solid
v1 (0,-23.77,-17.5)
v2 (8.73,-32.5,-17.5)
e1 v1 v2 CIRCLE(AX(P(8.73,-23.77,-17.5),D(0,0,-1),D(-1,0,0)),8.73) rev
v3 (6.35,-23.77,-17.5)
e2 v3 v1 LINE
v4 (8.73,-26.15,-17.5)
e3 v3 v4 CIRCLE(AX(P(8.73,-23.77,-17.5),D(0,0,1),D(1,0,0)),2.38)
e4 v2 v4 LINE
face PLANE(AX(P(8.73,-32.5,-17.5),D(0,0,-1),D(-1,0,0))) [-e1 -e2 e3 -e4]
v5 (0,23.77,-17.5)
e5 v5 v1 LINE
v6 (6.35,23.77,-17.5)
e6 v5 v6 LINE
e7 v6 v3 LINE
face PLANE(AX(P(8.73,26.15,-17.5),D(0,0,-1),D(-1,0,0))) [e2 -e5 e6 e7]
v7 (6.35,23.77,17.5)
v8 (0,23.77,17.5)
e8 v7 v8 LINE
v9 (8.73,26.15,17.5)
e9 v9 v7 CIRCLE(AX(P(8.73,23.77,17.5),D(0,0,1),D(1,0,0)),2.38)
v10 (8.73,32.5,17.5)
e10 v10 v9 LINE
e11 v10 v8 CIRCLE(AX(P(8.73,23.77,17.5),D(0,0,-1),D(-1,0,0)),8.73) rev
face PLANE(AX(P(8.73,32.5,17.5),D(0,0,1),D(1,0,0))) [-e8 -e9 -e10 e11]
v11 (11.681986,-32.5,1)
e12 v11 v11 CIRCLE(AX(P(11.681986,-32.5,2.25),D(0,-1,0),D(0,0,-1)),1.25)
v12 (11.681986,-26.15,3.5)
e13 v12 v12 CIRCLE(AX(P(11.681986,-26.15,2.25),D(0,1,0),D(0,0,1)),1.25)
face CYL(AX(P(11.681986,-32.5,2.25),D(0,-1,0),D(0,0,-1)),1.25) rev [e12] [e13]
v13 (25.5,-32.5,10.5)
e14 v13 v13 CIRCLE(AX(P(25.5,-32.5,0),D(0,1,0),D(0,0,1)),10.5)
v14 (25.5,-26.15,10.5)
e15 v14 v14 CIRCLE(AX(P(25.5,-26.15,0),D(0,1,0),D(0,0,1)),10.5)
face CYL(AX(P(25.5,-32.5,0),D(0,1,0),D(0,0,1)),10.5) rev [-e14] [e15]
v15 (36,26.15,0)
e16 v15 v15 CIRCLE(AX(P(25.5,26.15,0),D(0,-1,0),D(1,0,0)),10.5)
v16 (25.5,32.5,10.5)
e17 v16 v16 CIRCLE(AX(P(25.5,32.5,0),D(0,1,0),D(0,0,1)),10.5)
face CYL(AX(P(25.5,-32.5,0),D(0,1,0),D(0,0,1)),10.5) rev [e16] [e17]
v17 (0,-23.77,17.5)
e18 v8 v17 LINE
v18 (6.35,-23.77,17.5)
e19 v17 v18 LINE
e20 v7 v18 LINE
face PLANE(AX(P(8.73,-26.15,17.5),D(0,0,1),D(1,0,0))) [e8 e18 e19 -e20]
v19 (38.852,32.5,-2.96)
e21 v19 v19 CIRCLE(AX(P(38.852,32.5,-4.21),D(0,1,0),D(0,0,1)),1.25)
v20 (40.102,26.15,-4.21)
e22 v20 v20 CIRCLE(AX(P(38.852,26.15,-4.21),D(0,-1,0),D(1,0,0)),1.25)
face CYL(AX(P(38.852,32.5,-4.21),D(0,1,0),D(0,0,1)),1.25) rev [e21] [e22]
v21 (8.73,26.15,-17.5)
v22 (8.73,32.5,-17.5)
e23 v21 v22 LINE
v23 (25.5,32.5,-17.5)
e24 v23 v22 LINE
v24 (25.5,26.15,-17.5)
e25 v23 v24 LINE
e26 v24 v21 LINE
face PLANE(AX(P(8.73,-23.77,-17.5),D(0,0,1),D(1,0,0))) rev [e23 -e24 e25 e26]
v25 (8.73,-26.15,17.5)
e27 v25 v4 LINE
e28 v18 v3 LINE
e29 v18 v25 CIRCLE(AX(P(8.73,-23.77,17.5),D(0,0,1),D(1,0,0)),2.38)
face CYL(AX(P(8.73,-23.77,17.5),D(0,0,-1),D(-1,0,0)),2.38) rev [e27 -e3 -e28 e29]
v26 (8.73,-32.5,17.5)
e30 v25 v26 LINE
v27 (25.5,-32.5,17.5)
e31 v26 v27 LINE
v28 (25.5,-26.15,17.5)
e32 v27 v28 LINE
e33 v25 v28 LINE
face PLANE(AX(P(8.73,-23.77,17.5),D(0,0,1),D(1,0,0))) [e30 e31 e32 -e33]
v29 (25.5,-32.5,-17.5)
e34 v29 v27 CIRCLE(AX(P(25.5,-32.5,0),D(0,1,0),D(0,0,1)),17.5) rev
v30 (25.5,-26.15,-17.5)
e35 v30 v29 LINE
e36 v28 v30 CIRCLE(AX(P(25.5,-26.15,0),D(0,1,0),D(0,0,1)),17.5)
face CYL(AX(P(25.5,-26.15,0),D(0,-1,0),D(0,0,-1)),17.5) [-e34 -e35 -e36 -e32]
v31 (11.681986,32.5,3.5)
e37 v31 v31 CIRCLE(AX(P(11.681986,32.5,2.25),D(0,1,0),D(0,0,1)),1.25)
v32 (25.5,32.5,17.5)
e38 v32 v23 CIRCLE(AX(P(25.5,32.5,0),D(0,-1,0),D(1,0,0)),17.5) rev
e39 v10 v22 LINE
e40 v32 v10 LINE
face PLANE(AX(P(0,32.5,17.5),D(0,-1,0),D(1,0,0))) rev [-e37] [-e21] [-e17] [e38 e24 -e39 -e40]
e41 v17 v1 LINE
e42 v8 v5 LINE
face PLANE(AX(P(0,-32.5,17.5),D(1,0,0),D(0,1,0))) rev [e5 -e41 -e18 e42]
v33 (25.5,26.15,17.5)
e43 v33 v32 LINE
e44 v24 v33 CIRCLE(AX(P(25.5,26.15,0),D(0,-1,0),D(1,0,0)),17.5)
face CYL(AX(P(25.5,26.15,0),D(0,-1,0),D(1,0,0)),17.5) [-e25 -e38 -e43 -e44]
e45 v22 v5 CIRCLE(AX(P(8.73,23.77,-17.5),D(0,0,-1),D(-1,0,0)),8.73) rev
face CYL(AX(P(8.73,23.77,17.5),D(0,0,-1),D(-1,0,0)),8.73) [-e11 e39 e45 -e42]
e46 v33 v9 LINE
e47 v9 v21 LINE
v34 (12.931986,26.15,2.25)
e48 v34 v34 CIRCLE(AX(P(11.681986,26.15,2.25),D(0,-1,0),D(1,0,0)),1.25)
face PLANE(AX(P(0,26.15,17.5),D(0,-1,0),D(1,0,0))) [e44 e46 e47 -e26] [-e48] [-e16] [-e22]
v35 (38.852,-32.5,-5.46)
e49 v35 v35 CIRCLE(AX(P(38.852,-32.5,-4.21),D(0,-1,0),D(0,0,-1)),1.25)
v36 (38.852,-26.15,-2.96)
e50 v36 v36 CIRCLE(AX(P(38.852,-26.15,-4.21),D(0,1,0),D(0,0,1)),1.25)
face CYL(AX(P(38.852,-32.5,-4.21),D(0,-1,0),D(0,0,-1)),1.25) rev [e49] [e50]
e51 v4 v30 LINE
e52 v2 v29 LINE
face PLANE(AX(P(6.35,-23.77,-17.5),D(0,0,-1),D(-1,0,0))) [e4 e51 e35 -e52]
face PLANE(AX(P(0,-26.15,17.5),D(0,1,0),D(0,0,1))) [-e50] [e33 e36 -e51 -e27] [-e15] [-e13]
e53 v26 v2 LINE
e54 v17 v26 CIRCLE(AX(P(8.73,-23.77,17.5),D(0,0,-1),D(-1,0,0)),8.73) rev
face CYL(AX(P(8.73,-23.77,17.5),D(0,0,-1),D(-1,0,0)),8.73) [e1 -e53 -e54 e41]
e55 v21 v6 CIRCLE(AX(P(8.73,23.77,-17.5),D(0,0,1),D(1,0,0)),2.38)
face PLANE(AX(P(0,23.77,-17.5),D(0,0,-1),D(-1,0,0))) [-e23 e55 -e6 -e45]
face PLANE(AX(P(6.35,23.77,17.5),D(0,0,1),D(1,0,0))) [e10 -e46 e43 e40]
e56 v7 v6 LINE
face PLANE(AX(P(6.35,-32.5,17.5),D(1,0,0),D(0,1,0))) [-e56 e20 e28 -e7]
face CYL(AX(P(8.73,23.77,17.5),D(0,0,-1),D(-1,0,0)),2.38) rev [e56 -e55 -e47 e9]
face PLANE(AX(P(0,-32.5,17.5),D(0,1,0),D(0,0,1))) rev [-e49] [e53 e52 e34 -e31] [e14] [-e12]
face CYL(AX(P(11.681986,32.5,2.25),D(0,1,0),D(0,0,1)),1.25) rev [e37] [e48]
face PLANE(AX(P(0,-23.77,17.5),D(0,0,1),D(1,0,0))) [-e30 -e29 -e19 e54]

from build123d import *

# Parameters (mm, degrees)
BASE_FLANGE1_DEPTH        = 17.5
FILLET3_RADIUS            = 17.5
FILLET3_LENGTH            = 6.35
FILLET4_RADIUS            = 17.5
FILLET4_LENGTH            = 6.35
CUT_EXTRUDE6_DEPTH        = 57.670097935
CUT_EXTRUDE6_DEPTH_BACK   = 57.670097935
SKETCH23_R                = 10.5
M3X0_5_TAPPED_HOLE1_D     = 2.5
M3X0_5_TAPPED_HOLE1_DEPTH = 6.35
M3X0_5_TAPPED_HOLE2_D     = 2.5


# Sheet-metal steps are written as plain solids
with BuildPart() as part:
    # Sketch20 → Base-Flange1 (new, symmetric)
    with BuildSketch(Plane.XY):
        with BuildLine():
            Line((43, -32.5), (8.730000066, -32.5))
            ThreePointArc((8.730000066, -32.5), (2.55695782, -29.94304218), (0, -23.769999934))
            Line((0, -23.769999934), (0, 23.769999934))
            ThreePointArc((0, 23.769999934), (2.55695782, 29.94304218), (8.730000066, 32.5))
            Line((8.730000066, 32.5), (43, 32.5))
            Line((43, 32.5), (43, 26.15))
            Line((43, 26.15), (8.730000066, 26.15))
            ThreePointArc((8.730000066, 26.15), (7.04708588, 25.45291412), (6.35, 23.769999934))
            Line((6.35, 23.769999934), (6.35, -23.769999934))
            ThreePointArc((6.35, -23.769999934), (7.04708588, -25.45291412), (8.730000066, -26.15))
            Line((8.730000066, -26.15), (43, -26.15))
            Line((43, -26.15), (43, -32.5))
        make_face()
    extrude(amount=BASE_FLANGE1_DEPTH, both=True)

    # Fillet3: full round fillet: the end face becomes a half cylinder, R = half its width
    fillet3_face = Plane((43, 29.325, 0), x_dir=(0, 1, 0), z_dir=(1, 0, 0))  # on the end face: x along it, z out of the body
    fillet3_slab = fillet3_face.offset(-FILLET3_RADIUS / 2) * Box(FILLET3_LENGTH, 2 * FILLET3_RADIUS, FILLET3_RADIUS, mode=Mode.PRIVATE)  # the body's end, R deep
    fillet3_round = Plane((25.5, 29.325, 0), x_dir=(1, 0, 0), z_dir=(0, 1, 0)) * Cylinder(FILLET3_RADIUS, FILLET3_LENGTH, mode=Mode.PRIVATE)  # its axis R under the face
    add(fillet3_slab - fillet3_round, mode=Mode.SUBTRACT)

    # Fillet4: full round fillet: the end face becomes a half cylinder, R = half its width
    fillet4_face = Plane((43, -29.325, 0), x_dir=(0, 1, 0), z_dir=(1, 0, 0))  # on the end face: x along it, z out of the body
    fillet4_slab = fillet4_face.offset(-FILLET4_RADIUS / 2) * Box(FILLET4_LENGTH, 2 * FILLET4_RADIUS, FILLET4_RADIUS, mode=Mode.PRIVATE)  # the body's end, R deep
    fillet4_round = Plane((25.5, -29.325, 0), x_dir=(1, 0, 0), z_dir=(0, 1, 0)) * Cylinder(FILLET4_RADIUS, FILLET4_LENGTH, mode=Mode.PRIVATE)  # its axis R under the face
    add(fillet4_slab - fillet4_round, mode=Mode.SUBTRACT)

    # Sketch23 → Cut-Extrude6 (cut, two sides: drawn at the far end of the back side and taken through both)
    with BuildSketch(Plane(origin=(0, 0, 0), x_dir=(1, 0, 0), z_dir=(0, 1, 0)).offset(-CUT_EXTRUDE6_DEPTH_BACK)):
        with Locations(Location((25.5, 0, 0), (0, 0, 270))):
            Circle(SKETCH23_R)
    extrude(amount=CUT_EXTRUDE6_DEPTH + CUT_EXTRUDE6_DEPTH_BACK, mode=Mode.SUBTRACT)

    # M3x0.5 Tapped Hole1
    with Locations(Plane(origin=(0, 32.5, 0), x_dir=(1, 0, 0), z_dir=(0, 1, 0))):
        with Locations((38.85199985, 4.21), (11.681986395, -2.25)):
            Hole(M3X0_5_TAPPED_HOLE1_D / 2, depth=M3X0_5_TAPPED_HOLE1_DEPTH)

    # M3x0.5 Tapped Hole2 (through all)
    with Locations(Plane(origin=(0, -32.5, 0), x_dir=(-1, 0, 0), z_dir=(0, -1, 0))):
        with Locations((-11.681986395, -2.25), (-38.85199985, 4.21)):
            Hole(M3X0_5_TAPPED_HOLE2_D / 2)


solid = part.part
